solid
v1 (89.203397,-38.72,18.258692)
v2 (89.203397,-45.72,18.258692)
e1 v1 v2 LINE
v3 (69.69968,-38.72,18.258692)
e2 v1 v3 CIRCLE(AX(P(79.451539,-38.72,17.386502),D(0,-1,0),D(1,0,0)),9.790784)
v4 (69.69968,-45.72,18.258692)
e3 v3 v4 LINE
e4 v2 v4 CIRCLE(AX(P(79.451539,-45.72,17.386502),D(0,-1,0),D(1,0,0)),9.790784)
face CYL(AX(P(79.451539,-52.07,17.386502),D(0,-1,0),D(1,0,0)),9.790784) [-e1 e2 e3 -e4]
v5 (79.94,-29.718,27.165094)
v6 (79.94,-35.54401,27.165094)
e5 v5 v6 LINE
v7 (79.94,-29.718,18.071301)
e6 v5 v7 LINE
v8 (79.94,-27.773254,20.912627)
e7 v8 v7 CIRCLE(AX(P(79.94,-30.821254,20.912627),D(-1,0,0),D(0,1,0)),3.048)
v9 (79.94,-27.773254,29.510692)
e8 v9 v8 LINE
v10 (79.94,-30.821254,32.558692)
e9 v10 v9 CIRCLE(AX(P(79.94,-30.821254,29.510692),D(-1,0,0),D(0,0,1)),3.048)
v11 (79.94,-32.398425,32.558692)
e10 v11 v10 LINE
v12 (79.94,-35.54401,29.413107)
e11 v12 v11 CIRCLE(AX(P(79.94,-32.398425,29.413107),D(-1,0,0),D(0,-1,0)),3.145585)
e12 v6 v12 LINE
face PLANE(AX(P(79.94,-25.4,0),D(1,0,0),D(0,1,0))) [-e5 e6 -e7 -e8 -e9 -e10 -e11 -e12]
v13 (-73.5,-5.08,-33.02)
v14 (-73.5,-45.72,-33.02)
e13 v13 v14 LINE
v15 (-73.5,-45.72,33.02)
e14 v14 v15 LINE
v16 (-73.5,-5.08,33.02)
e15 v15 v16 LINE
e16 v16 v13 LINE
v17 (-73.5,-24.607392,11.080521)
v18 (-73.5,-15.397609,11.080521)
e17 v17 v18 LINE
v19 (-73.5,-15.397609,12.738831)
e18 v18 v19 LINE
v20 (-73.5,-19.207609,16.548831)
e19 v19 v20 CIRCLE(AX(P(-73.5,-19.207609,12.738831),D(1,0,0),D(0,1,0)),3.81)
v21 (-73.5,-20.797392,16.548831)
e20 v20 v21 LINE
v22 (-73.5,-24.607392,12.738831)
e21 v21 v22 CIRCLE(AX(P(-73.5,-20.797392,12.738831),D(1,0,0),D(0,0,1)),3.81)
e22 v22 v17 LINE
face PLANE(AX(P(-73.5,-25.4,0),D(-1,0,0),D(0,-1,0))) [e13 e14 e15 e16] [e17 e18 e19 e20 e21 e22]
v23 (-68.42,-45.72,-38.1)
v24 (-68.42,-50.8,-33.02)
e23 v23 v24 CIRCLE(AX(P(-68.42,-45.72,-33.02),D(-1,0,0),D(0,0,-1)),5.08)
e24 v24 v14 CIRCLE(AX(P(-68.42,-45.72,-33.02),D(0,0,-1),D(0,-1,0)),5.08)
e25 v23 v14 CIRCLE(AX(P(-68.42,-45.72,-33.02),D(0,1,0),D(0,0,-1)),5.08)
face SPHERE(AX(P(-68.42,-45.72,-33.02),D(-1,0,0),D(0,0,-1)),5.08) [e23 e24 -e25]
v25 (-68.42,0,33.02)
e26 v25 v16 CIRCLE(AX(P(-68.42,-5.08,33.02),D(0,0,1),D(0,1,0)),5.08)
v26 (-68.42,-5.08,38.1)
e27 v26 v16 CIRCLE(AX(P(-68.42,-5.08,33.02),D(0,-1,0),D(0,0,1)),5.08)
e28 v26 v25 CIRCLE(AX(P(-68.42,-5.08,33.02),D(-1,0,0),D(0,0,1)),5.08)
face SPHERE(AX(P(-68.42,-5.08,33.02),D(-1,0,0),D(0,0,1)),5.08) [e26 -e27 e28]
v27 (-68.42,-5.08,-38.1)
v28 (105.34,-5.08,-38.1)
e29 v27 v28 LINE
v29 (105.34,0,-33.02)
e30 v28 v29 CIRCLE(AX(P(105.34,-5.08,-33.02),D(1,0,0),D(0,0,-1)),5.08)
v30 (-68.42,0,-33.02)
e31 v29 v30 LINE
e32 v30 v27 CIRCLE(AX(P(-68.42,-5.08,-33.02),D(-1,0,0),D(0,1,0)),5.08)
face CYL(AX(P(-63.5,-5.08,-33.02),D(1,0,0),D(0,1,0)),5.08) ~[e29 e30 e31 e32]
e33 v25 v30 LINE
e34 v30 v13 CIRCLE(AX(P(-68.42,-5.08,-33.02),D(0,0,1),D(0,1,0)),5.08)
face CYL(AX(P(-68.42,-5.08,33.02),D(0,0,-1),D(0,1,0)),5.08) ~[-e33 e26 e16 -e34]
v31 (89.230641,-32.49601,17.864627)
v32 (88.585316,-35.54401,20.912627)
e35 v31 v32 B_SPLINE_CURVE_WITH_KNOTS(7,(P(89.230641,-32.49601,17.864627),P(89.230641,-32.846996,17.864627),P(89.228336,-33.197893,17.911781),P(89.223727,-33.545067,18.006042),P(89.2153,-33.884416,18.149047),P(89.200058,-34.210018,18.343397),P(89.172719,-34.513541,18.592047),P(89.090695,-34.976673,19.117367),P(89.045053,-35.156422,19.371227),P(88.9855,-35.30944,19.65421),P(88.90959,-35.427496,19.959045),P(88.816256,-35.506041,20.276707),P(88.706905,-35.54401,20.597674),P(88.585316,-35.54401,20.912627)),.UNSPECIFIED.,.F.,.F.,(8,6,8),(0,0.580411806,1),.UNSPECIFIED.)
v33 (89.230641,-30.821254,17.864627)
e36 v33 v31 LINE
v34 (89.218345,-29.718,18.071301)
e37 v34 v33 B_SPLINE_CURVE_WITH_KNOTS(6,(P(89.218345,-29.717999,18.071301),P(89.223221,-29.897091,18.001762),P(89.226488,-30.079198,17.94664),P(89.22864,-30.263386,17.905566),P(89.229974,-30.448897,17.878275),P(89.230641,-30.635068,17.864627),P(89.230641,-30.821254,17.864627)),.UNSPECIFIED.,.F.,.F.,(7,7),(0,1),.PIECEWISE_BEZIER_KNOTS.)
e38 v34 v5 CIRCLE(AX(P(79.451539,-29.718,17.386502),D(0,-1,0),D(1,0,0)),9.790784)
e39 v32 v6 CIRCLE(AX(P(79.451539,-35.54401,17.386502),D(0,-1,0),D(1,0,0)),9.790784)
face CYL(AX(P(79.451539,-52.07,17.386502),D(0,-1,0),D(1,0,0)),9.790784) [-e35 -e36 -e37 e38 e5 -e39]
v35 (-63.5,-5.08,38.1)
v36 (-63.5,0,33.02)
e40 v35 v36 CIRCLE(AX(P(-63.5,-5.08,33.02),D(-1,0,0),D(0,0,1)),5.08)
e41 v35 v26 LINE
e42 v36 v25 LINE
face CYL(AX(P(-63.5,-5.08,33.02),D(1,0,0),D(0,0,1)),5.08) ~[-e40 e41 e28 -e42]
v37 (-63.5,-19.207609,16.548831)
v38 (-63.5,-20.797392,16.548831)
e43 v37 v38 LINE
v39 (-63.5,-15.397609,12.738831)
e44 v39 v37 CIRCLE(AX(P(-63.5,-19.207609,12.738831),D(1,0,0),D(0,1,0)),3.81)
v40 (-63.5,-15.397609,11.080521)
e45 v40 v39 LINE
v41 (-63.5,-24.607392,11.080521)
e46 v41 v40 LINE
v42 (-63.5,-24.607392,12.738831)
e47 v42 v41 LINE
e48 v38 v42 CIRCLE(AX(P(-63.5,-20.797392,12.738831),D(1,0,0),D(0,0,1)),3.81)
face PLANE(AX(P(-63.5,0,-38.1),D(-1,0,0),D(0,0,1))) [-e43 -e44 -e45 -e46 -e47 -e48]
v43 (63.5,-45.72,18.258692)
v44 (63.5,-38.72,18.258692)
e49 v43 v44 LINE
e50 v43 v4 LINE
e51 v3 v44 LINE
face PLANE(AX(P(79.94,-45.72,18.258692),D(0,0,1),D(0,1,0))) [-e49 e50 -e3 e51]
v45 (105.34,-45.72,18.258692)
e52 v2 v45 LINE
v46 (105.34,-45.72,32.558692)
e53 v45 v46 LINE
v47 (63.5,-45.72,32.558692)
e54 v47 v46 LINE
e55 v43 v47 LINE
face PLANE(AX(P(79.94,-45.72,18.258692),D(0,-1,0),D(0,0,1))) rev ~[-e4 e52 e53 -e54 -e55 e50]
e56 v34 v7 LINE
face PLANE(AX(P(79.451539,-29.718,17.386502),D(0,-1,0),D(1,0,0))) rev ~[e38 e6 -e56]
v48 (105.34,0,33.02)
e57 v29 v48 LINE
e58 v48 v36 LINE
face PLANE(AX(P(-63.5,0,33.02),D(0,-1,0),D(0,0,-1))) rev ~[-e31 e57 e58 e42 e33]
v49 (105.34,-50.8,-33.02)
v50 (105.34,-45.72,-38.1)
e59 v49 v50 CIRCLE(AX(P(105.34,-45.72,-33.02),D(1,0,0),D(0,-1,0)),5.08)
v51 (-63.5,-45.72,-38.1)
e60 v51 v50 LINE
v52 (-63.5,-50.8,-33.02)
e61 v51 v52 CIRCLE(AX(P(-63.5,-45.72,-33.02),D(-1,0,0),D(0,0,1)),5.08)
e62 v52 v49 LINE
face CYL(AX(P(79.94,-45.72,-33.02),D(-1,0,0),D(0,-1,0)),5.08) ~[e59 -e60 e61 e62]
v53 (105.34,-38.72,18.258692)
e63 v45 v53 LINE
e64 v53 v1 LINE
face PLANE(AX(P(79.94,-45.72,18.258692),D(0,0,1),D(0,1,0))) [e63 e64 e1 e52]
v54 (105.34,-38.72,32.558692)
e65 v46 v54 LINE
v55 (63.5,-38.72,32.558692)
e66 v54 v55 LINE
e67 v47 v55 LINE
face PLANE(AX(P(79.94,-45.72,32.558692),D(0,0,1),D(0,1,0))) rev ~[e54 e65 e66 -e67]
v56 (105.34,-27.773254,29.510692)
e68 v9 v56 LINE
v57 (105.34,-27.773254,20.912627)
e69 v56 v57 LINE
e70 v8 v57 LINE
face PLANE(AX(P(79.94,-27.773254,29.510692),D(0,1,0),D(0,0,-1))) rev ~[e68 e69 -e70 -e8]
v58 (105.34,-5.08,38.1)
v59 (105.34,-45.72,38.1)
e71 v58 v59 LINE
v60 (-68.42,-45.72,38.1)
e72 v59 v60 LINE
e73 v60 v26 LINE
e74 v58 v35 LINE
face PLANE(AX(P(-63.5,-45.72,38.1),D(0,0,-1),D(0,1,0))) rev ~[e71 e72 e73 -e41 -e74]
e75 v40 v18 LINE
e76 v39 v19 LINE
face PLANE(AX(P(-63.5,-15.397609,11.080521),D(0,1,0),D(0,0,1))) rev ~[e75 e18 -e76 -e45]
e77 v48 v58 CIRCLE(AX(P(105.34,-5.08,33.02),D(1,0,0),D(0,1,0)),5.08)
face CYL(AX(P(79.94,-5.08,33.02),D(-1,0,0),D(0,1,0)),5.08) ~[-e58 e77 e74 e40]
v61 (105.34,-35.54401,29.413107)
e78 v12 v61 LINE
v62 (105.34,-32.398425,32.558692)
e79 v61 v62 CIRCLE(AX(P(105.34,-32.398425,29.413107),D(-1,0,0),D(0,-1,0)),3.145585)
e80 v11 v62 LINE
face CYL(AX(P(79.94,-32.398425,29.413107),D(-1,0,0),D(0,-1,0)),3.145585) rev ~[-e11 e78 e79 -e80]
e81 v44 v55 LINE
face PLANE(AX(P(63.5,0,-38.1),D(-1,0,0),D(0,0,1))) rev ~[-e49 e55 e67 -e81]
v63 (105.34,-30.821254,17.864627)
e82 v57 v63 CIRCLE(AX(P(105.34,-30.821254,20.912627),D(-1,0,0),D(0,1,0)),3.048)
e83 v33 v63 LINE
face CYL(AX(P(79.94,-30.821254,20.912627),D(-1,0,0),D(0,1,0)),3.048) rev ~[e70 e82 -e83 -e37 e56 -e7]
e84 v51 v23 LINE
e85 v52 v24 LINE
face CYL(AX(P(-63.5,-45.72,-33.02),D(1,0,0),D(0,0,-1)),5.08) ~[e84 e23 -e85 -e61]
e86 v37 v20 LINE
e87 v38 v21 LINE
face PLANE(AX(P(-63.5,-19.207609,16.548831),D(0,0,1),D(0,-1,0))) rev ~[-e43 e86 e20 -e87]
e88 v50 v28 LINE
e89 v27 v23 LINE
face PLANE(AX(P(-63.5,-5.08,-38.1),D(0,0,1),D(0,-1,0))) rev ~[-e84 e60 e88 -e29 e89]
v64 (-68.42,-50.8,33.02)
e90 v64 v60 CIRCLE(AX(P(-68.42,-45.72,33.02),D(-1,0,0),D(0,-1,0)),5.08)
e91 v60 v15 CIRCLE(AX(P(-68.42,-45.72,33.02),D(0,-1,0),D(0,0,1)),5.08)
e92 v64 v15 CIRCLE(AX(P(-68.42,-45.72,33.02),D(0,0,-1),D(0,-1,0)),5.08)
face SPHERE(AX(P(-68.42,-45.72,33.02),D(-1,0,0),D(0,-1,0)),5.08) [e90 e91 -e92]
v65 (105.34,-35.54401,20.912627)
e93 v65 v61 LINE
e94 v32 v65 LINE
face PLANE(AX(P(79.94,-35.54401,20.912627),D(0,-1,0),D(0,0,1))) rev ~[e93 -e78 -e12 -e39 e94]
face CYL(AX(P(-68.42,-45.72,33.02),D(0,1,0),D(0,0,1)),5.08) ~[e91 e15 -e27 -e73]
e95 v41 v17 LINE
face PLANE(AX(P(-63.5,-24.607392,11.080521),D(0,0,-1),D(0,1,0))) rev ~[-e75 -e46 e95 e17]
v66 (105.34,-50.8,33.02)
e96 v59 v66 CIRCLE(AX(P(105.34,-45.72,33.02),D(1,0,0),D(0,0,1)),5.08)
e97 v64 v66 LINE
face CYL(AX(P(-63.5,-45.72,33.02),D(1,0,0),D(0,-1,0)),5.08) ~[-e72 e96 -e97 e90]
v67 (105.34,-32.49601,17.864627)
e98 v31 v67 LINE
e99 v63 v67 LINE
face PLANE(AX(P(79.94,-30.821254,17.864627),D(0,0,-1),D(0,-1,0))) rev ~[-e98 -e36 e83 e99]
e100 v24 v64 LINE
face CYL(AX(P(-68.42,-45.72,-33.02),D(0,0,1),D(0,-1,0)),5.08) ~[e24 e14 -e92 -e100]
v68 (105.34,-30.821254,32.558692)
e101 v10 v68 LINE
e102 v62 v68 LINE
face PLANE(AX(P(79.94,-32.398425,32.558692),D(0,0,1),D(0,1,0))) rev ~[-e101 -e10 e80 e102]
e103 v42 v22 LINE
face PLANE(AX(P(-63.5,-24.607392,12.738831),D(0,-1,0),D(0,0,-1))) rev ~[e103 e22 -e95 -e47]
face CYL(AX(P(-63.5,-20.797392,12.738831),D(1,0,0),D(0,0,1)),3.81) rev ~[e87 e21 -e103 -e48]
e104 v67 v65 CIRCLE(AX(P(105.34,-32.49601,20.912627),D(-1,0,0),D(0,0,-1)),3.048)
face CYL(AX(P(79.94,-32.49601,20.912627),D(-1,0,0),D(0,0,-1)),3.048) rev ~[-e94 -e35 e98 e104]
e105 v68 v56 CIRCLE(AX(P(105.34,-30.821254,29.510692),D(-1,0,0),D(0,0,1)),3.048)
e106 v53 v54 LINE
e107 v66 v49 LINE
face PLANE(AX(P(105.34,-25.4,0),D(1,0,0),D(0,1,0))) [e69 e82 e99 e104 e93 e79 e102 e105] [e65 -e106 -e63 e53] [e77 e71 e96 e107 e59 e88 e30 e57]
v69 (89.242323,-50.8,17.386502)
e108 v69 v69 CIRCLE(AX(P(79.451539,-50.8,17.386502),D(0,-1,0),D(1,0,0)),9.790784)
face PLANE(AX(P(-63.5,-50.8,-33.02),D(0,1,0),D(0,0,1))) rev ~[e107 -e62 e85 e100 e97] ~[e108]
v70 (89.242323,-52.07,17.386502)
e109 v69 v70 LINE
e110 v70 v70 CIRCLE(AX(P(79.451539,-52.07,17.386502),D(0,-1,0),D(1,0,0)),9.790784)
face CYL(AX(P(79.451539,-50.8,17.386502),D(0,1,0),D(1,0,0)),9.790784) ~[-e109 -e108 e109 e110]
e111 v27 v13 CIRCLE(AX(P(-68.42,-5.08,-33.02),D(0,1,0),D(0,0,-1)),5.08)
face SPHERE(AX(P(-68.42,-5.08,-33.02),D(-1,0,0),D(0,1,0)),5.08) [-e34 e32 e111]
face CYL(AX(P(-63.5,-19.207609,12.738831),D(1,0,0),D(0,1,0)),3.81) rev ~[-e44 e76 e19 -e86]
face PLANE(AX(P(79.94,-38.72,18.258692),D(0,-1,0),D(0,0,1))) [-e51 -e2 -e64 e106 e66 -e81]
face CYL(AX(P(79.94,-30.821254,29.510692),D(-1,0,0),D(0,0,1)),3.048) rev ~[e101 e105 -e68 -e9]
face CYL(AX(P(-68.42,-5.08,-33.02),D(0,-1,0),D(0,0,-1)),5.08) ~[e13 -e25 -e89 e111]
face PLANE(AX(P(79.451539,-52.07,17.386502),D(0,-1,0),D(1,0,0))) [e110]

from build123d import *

# Parameters (mm, degrees)
F0_W      = 127
F0_H      = 76.2
F1_DEPTH  = 50.8
F2_R      = 5.08
F3_W      = 7
F3_H      = 14.7
F4_DEPTH  = 16.4
F5_W      = 7
F5_H      = 14.3
F6_DEPTH  = 16.44
F7_W      = 7
F7_H      = 14.3
F8_DEPTH  = 25.4
F9_R      = 9.7907841867
F10_DEPTH = 1.27
F11_DEPTH = 22.352
F13_DEPTH = 25.4
F14_DEPTH = 25.4
F15_DEPTH = 25.4
F16_DEPTH = 10
F17_R     = 5.08


with BuildPart() as f1:
    # F0 (on Front) → F1 (new body)
    with BuildSketch(Plane.XZ):
        Rectangle(F0_W, F0_H)
    extrude(amount=F1_DEPTH)

    # F2
    f2_edges = [f1.edges().sort_by_distance(p)[0] for p in [
        (0, -50.8, 38.1),
        (0, 0, 38.1),
        (0, -50.8, -38.1),
        (0, 0, -38.1),
    ]]
    fillet(f2_edges, radius=F2_R)

    # F3 (on face) → F4 (join)
    with BuildSketch(Plane.YZ.offset(63.5)):
        with BuildLine():
            Line((-5.08, 38.1), (-45.72, 38.1))
            ThreePointArc((-45.72, 38.1), (-49.3121024484, 36.6121024484), (-50.8, 33.02))
            Line((-50.8, 33.02), (-50.8, -33.02))
            ThreePointArc((-50.8, -33.02), (-49.3121024484, -36.6121024484), (-45.72, -38.1))
            Line((-45.72, -38.1), (-5.08, -38.1))
            ThreePointArc((-5.08, -38.1), (-1.4878975516, -36.6121024484), (0, -33.02))
            Line((0, -33.02), (0, 33.02))
            ThreePointArc((0, 33.02), (-1.4878975516, 36.6121024484), (-5.08, 38.1))
        make_face()
        with Locations((-42.22, 25.675587382)):
            Rectangle(F3_W, F3_H, mode=Mode.SUBTRACT)
        with Locations((-42.22, 25.675587382)):
            Rectangle(F3_W, F3_H)
    extrude(amount=-F4_DEPTH)

    # F5 (on face) → F6 (join)
    with BuildSketch(Plane.YZ.offset(63.5)):
        with BuildLine():
            ThreePointArc((-50.8, -33.02), (-49.3121024484, -36.6121024484), (-45.72, -38.1))
            Line((-45.72, -38.1), (-5.08, -38.1))
            ThreePointArc((-5.08, -38.1), (-1.4878975516, -36.6121024484), (0, -33.02))
            Line((0, -33.02), (0, 33.02))
            ThreePointArc((0, 33.02), (-1.4878975516, 36.6121024484), (-5.08, 38.1))
            Line((-5.08, 38.1), (-45.72, 38.1))
            ThreePointArc((-45.72, 38.1), (-49.3121024484, 36.6121024484), (-50.8, 33.02))
            Line((-50.8, 33.02), (-50.8, -33.02))
        make_face()
        with Locations((-42.22, 25.4086919344)):
            Rectangle(F5_W, F5_H, mode=Mode.SUBTRACT)
    extrude(amount=F6_DEPTH)

    # F7 (on face) → F8 (join)
    with BuildSketch(Plane.YZ.offset(79.94)):
        with BuildLine():
            Line((-5.08, 38.1), (-45.72, 38.1))
            ThreePointArc((-45.72, 38.1), (-49.3121024484, 36.6121024484), (-50.8, 33.02))
            Line((-50.8, 33.02), (-50.8, -33.02))
            ThreePointArc((-50.8, -33.02), (-49.3121024484, -36.6121024484), (-45.72, -38.1))
            Line((-45.72, -38.1), (-5.08, -38.1))
            ThreePointArc((-5.08, -38.1), (-1.4878975516, -36.6121024484), (0, -33.02))
            Line((0, -33.02), (0, 33.02))
            ThreePointArc((0, 33.02), (-1.4878975516, 36.6121024484), (-5.08, 38.1))
        make_face()
        with Locations((-42.22, 25.4086919344)):
            Rectangle(F7_W, F7_H, mode=Mode.SUBTRACT)
        with BuildLine():
            Line((-35.5440098792, 20.9126272823), (-35.5440098792, 29.4131070442))
            ThreePointArc((-35.5440098792, 29.4131070442), (-34.6226893957, 31.6373714509), (-32.398424989, 32.5586919344))
            Line((-32.398424989, 32.5586919344), (-30.8212536197, 32.5586919344))
            ThreePointArc((-30.8212536197, 32.5586919344), (-28.6659921506, 31.6659534035), (-27.7732536197, 29.5106919344))
            Line((-27.7732536197, 29.5106919344), (-27.7732536197, 20.9126272823))
            ThreePointArc((-27.7732536197, 20.9126272823), (-28.6659921506, 18.7573658132), (-30.8212536197, 17.8646272823))
            Line((-30.8212536197, 17.8646272823), (-32.4960098792, 17.8646272823))
            ThreePointArc((-32.4960098792, 17.8646272823), (-34.6512713483, 18.7573658132), (-35.5440098792, 20.9126272823))
        make_face(mode=Mode.SUBTRACT)
    extrude(amount=F8_DEPTH)

    # F9 (on face) → F10 (join)
    with BuildSketch(Plane.XZ.offset(50.8)):
        with Locations((79.4515386224, 17.386501655)):
            Circle(F9_R)
    extrude(amount=F10_DEPTH)

    # F11 (add): a face of the model
    f11_faces = [f1.faces().sort_by_distance(p)[0] for p in [
        (79.4515386224, -52.07, 17.386501655),
    ]]
    extrude(f11_faces, amount=-F11_DEPTH)

    # F12 (on face) → F13 (join)
    with BuildSketch(Plane(origin=(-63.5, 0, 0), x_dir=(0, -1, 0), z_dir=(-1, 0, 0))):
        with BuildLine():
            Line((20.797392028, 16.5488310158), (19.2076092115, 16.5488310158))
            ThreePointArc((19.2076092115, 16.5488310158), (16.5135323752, 15.4329078521), (15.3976092115, 12.7388310158))
            Line((15.3976092115, 12.7388310158), (15.3976092115, 11.0805211589))
            Line((15.3976092115, 11.0805211589), (15.6854148954, 11.0805211589))
            Line((15.6854148954, 11.0805211589), (24.607392028, 11.0805211589))
            Line((24.607392028, 11.0805211589), (24.607392028, 12.7388310158))
            ThreePointArc((24.607392028, 12.7388310158), (23.4914688643, 15.4329078521), (20.797392028, 16.5488310158))
        make_face()
    extrude(amount=-F13_DEPTH)

    # F12 (on face) → F14 (join)
    with BuildSketch(Plane(origin=(-63.5, 0, 0), x_dir=(0, -1, 0), z_dir=(-1, 0, 0))):
        with BuildLine():
            Line((20.797392028, 16.5488310158), (19.2076092115, 16.5488310158))
            ThreePointArc((19.2076092115, 16.5488310158), (16.5135323752, 15.4329078521), (15.3976092115, 12.7388310158))
            Line((15.3976092115, 12.7388310158), (15.3976092115, 11.0805211589))
            Line((15.3976092115, 11.0805211589), (15.6854148954, 11.0805211589))
            Line((15.6854148954, 11.0805211589), (24.607392028, 11.0805211589))
            Line((24.607392028, 11.0805211589), (24.607392028, 12.7388310158))
            ThreePointArc((24.607392028, 12.7388310158), (23.4914688643, 15.4329078521), (20.797392028, 16.5488310158))
        make_face()
    extrude(amount=-F14_DEPTH)

    # F12 (on face) → F15 (join)
    with BuildSketch(Plane(origin=(-63.5, 0, 0), x_dir=(0, -1, 0), z_dir=(-1, 0, 0))):
        with BuildLine():
            Line((20.797392028, 16.5488310158), (19.2076092115, 16.5488310158))
            ThreePointArc((19.2076092115, 16.5488310158), (16.5135323752, 15.4329078521), (15.3976092115, 12.7388310158))
            Line((15.3976092115, 12.7388310158), (15.3976092115, 11.0805211589))
            Line((15.3976092115, 11.0805211589), (15.6854148954, 11.0805211589))
            Line((15.6854148954, 11.0805211589), (24.607392028, 11.0805211589))
            Line((24.607392028, 11.0805211589), (24.607392028, 12.7388310158))
            ThreePointArc((24.607392028, 12.7388310158), (23.4914688643, 15.4329078521), (20.797392028, 16.5488310158))
        make_face()
    extrude(amount=-F15_DEPTH)

    # F12 (on face) → F16 (join)
    with BuildSketch(Plane(origin=(-63.5, 0, 0), x_dir=(0, -1, 0), z_dir=(-1, 0, 0))):
        with BuildLine():
            ThreePointArc((50.8, 33.02), (49.3121024484, 36.6121024484), (45.72, 38.1))
            Line((45.72, 38.1), (5.08, 38.1))
            ThreePointArc((5.08, 38.1), (1.4878975516, 36.6121024484), (0, 33.02))
            Line((0, 33.02), (0, -33.02))
            ThreePointArc((0, -33.02), (1.4878975516, -36.6121024484), (5.08, -38.1))
            Line((5.08, -38.1), (45.72, -38.1))
            ThreePointArc((45.72, -38.1), (49.3121024484, -36.6121024484), (50.8, -33.02))
            Line((50.8, -33.02), (50.8, 33.02))
        make_face()
        with BuildLine():
            ThreePointArc((15.3976092115, 12.7388310158), (16.5135323752, 15.4329078521), (19.2076092115, 16.5488310158))
            Line((19.2076092115, 16.5488310158), (20.797392028, 16.5488310158))
            ThreePointArc((20.797392028, 16.5488310158), (23.4914688643, 15.4329078521), (24.607392028, 12.7388310158))
            Line((24.607392028, 12.7388310158), (24.607392028, 11.0805211589))
            Line((24.607392028, 11.0805211589), (15.6854148954, 11.0805211589))
            Line((15.6854148954, 11.0805211589), (15.3976092115, 11.0805211589))
            Line((15.3976092115, 11.0805211589), (15.3976092115, 12.7388310158))
        make_face(mode=Mode.SUBTRACT)
    extrude(amount=F16_DEPTH)

    # F17
    f17_edges = [f1.edges().sort_by_distance(p)[0] for p in [
        (-73.5, -25.4, 38.1),
        (-73.5, 0, 0),
        (-73.5, -25.4, -38.1),
        (-73.5, -50.8, 0),
        (-73.5, -49.312102, 36.612102),
        (-73.5, -1.487898, 36.612102),
        (-73.5, -49.312102, -36.612102),
        (-73.5, -1.487898, -36.612102),
    ]]
    fillet(f17_edges, radius=F17_R)


solid = f1.part
